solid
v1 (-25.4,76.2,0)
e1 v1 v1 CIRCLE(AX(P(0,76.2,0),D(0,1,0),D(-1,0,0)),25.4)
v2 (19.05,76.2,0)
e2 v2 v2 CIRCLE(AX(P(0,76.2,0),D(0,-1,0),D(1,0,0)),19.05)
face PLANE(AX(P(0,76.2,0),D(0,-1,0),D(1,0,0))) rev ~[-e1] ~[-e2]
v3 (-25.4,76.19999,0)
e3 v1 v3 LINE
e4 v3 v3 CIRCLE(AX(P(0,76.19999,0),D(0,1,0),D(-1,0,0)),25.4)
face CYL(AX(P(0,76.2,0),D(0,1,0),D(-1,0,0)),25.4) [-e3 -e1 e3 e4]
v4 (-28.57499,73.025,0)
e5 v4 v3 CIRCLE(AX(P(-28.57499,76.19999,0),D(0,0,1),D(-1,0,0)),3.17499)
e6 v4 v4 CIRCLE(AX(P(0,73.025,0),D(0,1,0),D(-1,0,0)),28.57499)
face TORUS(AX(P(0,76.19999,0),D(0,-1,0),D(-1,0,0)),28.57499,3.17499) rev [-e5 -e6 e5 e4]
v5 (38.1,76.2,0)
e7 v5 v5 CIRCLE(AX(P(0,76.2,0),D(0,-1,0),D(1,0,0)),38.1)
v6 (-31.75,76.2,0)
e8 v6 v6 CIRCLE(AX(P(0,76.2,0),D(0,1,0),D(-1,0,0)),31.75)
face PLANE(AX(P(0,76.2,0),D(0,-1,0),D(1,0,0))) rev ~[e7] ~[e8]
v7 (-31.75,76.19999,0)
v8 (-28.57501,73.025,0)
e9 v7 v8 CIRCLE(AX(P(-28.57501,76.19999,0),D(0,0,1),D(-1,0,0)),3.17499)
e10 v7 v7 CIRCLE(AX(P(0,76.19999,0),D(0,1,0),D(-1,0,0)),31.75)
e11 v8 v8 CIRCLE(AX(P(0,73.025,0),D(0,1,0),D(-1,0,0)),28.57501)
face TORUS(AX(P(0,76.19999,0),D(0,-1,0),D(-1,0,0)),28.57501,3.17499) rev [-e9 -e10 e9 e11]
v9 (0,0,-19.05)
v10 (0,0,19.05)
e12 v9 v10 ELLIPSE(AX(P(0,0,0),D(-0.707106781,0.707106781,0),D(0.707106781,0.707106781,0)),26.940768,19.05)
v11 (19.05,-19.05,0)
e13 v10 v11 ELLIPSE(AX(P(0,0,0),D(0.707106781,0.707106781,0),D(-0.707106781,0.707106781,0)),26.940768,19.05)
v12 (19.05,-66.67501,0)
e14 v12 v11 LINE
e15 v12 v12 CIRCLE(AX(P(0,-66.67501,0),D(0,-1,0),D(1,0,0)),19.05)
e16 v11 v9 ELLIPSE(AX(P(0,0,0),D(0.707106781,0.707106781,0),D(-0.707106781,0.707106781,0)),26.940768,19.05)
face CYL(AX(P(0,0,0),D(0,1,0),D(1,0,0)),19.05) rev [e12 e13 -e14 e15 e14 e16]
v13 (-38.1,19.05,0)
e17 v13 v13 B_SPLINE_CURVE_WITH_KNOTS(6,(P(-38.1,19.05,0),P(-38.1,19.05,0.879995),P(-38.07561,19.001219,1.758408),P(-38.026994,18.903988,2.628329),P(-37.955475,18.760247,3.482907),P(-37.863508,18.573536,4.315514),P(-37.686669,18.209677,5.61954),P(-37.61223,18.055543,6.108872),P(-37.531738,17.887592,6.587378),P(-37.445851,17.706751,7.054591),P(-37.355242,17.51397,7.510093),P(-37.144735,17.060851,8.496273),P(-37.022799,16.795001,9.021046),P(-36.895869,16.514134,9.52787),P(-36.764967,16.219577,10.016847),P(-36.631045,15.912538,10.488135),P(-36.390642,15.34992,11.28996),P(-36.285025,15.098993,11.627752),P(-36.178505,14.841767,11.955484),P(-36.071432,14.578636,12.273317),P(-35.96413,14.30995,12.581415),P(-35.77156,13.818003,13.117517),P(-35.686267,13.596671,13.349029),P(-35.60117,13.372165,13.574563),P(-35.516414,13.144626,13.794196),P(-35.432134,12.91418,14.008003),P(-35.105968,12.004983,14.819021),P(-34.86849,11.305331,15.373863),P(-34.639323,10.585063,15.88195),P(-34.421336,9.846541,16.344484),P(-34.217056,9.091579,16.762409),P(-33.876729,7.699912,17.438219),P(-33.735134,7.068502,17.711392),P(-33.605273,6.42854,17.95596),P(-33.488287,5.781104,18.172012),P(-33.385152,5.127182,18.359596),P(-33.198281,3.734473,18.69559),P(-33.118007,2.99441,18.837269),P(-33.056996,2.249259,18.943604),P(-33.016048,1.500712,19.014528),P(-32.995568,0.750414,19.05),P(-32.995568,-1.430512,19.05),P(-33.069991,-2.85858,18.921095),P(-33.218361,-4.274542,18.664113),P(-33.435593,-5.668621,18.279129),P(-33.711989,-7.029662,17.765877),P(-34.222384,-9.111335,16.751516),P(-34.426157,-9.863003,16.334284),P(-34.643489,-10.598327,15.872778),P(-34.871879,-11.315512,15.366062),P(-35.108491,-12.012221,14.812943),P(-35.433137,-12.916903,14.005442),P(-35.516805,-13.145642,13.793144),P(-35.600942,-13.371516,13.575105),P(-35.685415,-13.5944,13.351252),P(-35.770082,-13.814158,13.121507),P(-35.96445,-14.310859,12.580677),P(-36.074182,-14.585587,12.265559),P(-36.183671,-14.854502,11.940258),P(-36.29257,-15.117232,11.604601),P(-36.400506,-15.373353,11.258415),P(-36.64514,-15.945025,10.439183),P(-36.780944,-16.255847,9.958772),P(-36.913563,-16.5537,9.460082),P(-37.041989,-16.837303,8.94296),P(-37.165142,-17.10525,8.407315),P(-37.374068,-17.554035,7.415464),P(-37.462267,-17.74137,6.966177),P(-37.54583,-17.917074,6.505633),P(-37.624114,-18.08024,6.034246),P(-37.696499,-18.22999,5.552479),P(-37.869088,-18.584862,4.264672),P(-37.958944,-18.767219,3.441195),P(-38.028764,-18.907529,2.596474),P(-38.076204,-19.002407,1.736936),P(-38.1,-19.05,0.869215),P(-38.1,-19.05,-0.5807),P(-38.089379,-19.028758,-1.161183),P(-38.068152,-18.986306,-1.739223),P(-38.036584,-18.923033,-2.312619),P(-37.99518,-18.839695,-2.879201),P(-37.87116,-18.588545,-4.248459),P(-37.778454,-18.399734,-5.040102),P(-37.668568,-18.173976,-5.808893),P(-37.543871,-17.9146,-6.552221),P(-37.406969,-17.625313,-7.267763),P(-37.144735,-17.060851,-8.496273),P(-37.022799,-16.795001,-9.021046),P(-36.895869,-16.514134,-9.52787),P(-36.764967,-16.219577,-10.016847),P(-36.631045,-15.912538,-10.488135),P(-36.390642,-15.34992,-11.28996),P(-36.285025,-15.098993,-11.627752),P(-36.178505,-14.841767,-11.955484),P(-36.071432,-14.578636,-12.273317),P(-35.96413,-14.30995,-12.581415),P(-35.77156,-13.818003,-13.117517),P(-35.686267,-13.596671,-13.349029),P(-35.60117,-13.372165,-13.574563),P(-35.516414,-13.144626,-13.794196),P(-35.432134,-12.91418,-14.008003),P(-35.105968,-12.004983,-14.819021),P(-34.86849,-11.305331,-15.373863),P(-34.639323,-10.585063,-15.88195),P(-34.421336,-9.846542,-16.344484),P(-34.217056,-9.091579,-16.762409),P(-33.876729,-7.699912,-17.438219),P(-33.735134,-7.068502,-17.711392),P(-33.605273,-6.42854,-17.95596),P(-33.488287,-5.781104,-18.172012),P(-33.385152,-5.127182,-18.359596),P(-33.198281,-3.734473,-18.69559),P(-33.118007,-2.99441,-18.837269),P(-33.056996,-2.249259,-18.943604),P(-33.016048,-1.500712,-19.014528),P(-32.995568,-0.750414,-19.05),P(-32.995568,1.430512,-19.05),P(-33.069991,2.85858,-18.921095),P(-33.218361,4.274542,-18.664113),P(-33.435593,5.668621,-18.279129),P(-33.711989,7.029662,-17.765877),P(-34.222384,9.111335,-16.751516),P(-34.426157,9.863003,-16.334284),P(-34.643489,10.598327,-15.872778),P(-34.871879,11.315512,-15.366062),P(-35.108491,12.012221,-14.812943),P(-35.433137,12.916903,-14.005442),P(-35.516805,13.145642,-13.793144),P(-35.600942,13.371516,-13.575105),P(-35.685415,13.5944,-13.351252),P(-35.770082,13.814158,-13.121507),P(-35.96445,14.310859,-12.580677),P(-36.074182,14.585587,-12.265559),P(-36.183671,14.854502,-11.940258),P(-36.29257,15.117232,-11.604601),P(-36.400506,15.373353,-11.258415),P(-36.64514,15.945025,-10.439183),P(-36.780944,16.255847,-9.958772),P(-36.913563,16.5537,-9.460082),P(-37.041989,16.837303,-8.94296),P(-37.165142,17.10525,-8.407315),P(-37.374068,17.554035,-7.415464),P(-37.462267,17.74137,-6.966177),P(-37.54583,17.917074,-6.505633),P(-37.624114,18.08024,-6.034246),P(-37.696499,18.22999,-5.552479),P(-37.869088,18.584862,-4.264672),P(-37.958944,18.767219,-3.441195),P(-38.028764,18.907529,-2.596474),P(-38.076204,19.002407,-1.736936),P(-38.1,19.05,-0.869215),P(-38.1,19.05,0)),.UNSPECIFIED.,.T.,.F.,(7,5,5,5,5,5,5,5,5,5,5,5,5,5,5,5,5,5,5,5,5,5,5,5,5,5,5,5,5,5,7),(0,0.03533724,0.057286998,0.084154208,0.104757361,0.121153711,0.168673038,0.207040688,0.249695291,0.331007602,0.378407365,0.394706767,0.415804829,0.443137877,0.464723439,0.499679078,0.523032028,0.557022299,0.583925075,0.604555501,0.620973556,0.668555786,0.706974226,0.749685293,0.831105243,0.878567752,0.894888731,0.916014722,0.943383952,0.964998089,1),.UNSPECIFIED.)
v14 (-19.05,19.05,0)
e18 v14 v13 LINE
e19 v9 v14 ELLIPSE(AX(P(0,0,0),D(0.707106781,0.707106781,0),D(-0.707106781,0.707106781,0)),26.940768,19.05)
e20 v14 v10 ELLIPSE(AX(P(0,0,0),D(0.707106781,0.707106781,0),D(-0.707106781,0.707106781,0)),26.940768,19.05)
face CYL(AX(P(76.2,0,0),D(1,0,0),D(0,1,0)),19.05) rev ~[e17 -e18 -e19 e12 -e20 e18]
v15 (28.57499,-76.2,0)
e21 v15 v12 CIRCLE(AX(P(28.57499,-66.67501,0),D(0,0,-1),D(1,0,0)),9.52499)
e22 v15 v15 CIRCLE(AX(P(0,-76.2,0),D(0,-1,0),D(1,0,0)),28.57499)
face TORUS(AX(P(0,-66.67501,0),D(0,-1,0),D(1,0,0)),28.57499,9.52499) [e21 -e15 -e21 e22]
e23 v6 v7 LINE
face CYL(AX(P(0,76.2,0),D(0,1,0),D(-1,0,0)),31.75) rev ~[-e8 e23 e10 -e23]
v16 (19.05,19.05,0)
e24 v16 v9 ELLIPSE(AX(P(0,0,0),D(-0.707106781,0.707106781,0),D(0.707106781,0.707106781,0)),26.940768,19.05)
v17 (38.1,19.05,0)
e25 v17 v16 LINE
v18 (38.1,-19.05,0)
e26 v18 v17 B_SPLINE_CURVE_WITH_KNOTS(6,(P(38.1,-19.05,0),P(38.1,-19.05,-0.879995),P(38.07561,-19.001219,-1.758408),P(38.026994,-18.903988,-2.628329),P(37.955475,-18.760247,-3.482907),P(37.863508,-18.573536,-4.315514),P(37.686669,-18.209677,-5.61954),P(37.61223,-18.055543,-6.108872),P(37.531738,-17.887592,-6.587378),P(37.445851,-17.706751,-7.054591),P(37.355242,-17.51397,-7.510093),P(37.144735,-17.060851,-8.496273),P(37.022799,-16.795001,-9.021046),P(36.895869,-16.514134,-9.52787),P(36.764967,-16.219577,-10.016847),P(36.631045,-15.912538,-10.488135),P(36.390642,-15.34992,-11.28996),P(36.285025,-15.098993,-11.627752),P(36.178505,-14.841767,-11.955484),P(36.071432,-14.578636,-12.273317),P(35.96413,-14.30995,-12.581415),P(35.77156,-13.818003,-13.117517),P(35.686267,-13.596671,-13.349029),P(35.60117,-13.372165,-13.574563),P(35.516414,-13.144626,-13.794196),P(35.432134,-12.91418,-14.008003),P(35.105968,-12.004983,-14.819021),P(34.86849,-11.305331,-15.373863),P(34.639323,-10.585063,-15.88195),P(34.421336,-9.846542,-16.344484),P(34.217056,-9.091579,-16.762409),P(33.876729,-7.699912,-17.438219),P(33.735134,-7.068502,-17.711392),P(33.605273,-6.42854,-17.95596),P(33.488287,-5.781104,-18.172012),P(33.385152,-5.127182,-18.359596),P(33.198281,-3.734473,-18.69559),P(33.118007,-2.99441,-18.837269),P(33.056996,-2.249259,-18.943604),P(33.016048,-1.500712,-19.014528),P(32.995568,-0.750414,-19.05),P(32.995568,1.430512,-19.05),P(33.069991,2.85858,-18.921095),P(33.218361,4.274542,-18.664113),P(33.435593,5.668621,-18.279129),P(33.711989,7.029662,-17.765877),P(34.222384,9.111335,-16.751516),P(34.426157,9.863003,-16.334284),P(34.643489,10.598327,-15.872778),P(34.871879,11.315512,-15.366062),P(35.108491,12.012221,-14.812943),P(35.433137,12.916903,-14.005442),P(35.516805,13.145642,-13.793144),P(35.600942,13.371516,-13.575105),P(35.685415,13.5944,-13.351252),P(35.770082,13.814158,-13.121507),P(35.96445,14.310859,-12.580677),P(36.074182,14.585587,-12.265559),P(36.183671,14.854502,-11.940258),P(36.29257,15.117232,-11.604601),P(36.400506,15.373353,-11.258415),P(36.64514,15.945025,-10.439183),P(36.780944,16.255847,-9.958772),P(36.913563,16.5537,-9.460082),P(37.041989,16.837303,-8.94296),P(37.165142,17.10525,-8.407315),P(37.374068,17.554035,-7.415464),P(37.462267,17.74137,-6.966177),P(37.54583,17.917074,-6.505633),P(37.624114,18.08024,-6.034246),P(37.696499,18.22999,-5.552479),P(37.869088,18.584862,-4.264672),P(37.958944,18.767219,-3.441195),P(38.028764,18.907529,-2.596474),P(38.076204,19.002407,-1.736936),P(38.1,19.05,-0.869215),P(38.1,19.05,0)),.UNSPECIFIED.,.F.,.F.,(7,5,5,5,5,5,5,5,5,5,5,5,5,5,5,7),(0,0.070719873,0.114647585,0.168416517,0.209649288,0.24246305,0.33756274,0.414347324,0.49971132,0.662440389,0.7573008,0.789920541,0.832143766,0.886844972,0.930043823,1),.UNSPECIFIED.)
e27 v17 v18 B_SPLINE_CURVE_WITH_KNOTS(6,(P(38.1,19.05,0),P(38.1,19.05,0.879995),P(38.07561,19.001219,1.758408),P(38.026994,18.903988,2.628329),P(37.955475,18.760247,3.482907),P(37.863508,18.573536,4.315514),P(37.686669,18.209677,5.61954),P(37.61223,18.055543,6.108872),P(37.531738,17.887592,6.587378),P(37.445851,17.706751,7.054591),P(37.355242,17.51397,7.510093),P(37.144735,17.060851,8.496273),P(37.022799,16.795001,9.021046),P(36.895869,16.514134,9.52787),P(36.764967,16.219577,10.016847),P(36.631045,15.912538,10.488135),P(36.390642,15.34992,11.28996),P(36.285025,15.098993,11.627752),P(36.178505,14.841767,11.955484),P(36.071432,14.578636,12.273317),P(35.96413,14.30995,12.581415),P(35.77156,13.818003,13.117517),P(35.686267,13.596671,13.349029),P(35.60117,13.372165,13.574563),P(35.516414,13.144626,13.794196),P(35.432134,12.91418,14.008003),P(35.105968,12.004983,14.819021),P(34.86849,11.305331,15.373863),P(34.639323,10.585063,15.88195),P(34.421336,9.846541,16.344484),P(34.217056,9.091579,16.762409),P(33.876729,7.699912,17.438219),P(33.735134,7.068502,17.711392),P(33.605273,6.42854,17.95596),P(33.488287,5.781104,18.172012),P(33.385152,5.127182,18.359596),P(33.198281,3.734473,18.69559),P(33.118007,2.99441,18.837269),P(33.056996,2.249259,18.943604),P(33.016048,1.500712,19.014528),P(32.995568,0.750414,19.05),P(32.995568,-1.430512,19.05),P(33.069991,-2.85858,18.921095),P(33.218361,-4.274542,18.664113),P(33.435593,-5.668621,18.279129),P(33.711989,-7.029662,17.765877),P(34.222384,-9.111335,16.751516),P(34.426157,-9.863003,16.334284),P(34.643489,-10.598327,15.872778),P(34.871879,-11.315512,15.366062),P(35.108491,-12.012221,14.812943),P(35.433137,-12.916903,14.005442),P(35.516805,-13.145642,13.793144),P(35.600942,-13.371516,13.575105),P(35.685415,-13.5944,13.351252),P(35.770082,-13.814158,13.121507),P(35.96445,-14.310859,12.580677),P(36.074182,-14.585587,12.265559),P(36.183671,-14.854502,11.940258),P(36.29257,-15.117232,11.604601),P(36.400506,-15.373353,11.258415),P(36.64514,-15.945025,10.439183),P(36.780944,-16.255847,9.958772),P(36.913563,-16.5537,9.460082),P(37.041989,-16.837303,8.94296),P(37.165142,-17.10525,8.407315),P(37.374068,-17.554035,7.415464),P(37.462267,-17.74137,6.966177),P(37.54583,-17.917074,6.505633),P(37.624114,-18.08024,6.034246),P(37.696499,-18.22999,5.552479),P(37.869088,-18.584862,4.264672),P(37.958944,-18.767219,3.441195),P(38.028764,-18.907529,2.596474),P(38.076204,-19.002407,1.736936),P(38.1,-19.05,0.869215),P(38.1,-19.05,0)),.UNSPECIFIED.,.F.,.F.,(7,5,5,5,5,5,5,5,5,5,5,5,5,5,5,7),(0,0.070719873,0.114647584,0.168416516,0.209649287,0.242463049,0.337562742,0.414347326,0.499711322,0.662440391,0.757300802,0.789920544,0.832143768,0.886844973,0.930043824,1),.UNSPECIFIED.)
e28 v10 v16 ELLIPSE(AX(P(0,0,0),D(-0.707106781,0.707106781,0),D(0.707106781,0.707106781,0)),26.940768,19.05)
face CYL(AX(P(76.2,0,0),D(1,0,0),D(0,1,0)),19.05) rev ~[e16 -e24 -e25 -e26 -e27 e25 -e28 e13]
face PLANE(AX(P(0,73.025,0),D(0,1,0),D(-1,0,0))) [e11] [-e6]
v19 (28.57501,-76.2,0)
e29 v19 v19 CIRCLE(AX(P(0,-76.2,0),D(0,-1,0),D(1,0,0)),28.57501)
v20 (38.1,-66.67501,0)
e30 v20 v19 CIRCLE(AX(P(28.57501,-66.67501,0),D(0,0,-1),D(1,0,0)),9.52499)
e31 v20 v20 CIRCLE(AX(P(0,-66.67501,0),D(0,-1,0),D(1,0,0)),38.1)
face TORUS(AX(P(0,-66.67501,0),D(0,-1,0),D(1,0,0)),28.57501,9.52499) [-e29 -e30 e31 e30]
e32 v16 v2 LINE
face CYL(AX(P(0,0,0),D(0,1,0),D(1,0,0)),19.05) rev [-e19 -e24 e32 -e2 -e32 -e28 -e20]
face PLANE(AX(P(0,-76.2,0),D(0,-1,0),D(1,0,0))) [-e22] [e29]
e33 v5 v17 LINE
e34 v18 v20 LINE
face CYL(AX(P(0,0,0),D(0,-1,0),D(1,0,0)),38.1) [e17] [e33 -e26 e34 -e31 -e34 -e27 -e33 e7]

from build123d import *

# Parameters (mm, degrees)
F0_R     = 38.1
F0_R_2   = 19.05
F1_DEPTH = 76.2
F2_R     = 9.52499
F4_R     = 31.75
F4_R_2   = 25.4
F5_DEPTH = 3.175
F6_R     = 3.17499
F8_R     = 19.05
F9_DEPTH = 152.4


# Not quite as in the source:
# - a fillet or chamfer is up to 0.001 mm smaller than in the source, because OpenCascade refuses the exact size


with BuildPart() as f1:
    # F0 (on Front) → F1 (new body, symmetric)
    with BuildSketch(Plane.XZ):
        Circle(F0_R)
        Circle(F0_R_2, mode=Mode.SUBTRACT)
    extrude(amount=F1_DEPTH, both=True)

    # F2 (radius 9.525 in the source; OpenCascade refuses exactly that, so slightly less here)
    f2_edges = [f1.edges().sort_by_distance(p)[0] for p in [
        (-38.1, -76.2, 0),
        (-19.05, -76.2, 0),
    ]]
    fillet(f2_edges, radius=F2_R)

    # F4 (on offset) → F5 (cut)
    with BuildSketch(Plane(origin=(0, 76.2, 0), x_dir=(-1, 0, 0), z_dir=(0, 1, 0))):
        Circle(F4_R)
        Circle(F4_R_2, mode=Mode.SUBTRACT)
    extrude(amount=-F5_DEPTH, mode=Mode.SUBTRACT)

    # F6 (radius 3.175 in the source; OpenCascade refuses exactly that, so slightly less here)
    f6_edges = [f1.edges().sort_by_distance(p)[0] for p in [
        (31.75, 73.025, 0),
        (25.4, 73.025, 0),
    ]]
    fillet(f6_edges, radius=F6_R)

    # F8 (on offset) → F9 (cut)
    with BuildSketch(Plane.YZ.offset(76.2)):
        Circle(F8_R)
    extrude(amount=-F9_DEPTH, mode=Mode.SUBTRACT)


solid = f1.part
